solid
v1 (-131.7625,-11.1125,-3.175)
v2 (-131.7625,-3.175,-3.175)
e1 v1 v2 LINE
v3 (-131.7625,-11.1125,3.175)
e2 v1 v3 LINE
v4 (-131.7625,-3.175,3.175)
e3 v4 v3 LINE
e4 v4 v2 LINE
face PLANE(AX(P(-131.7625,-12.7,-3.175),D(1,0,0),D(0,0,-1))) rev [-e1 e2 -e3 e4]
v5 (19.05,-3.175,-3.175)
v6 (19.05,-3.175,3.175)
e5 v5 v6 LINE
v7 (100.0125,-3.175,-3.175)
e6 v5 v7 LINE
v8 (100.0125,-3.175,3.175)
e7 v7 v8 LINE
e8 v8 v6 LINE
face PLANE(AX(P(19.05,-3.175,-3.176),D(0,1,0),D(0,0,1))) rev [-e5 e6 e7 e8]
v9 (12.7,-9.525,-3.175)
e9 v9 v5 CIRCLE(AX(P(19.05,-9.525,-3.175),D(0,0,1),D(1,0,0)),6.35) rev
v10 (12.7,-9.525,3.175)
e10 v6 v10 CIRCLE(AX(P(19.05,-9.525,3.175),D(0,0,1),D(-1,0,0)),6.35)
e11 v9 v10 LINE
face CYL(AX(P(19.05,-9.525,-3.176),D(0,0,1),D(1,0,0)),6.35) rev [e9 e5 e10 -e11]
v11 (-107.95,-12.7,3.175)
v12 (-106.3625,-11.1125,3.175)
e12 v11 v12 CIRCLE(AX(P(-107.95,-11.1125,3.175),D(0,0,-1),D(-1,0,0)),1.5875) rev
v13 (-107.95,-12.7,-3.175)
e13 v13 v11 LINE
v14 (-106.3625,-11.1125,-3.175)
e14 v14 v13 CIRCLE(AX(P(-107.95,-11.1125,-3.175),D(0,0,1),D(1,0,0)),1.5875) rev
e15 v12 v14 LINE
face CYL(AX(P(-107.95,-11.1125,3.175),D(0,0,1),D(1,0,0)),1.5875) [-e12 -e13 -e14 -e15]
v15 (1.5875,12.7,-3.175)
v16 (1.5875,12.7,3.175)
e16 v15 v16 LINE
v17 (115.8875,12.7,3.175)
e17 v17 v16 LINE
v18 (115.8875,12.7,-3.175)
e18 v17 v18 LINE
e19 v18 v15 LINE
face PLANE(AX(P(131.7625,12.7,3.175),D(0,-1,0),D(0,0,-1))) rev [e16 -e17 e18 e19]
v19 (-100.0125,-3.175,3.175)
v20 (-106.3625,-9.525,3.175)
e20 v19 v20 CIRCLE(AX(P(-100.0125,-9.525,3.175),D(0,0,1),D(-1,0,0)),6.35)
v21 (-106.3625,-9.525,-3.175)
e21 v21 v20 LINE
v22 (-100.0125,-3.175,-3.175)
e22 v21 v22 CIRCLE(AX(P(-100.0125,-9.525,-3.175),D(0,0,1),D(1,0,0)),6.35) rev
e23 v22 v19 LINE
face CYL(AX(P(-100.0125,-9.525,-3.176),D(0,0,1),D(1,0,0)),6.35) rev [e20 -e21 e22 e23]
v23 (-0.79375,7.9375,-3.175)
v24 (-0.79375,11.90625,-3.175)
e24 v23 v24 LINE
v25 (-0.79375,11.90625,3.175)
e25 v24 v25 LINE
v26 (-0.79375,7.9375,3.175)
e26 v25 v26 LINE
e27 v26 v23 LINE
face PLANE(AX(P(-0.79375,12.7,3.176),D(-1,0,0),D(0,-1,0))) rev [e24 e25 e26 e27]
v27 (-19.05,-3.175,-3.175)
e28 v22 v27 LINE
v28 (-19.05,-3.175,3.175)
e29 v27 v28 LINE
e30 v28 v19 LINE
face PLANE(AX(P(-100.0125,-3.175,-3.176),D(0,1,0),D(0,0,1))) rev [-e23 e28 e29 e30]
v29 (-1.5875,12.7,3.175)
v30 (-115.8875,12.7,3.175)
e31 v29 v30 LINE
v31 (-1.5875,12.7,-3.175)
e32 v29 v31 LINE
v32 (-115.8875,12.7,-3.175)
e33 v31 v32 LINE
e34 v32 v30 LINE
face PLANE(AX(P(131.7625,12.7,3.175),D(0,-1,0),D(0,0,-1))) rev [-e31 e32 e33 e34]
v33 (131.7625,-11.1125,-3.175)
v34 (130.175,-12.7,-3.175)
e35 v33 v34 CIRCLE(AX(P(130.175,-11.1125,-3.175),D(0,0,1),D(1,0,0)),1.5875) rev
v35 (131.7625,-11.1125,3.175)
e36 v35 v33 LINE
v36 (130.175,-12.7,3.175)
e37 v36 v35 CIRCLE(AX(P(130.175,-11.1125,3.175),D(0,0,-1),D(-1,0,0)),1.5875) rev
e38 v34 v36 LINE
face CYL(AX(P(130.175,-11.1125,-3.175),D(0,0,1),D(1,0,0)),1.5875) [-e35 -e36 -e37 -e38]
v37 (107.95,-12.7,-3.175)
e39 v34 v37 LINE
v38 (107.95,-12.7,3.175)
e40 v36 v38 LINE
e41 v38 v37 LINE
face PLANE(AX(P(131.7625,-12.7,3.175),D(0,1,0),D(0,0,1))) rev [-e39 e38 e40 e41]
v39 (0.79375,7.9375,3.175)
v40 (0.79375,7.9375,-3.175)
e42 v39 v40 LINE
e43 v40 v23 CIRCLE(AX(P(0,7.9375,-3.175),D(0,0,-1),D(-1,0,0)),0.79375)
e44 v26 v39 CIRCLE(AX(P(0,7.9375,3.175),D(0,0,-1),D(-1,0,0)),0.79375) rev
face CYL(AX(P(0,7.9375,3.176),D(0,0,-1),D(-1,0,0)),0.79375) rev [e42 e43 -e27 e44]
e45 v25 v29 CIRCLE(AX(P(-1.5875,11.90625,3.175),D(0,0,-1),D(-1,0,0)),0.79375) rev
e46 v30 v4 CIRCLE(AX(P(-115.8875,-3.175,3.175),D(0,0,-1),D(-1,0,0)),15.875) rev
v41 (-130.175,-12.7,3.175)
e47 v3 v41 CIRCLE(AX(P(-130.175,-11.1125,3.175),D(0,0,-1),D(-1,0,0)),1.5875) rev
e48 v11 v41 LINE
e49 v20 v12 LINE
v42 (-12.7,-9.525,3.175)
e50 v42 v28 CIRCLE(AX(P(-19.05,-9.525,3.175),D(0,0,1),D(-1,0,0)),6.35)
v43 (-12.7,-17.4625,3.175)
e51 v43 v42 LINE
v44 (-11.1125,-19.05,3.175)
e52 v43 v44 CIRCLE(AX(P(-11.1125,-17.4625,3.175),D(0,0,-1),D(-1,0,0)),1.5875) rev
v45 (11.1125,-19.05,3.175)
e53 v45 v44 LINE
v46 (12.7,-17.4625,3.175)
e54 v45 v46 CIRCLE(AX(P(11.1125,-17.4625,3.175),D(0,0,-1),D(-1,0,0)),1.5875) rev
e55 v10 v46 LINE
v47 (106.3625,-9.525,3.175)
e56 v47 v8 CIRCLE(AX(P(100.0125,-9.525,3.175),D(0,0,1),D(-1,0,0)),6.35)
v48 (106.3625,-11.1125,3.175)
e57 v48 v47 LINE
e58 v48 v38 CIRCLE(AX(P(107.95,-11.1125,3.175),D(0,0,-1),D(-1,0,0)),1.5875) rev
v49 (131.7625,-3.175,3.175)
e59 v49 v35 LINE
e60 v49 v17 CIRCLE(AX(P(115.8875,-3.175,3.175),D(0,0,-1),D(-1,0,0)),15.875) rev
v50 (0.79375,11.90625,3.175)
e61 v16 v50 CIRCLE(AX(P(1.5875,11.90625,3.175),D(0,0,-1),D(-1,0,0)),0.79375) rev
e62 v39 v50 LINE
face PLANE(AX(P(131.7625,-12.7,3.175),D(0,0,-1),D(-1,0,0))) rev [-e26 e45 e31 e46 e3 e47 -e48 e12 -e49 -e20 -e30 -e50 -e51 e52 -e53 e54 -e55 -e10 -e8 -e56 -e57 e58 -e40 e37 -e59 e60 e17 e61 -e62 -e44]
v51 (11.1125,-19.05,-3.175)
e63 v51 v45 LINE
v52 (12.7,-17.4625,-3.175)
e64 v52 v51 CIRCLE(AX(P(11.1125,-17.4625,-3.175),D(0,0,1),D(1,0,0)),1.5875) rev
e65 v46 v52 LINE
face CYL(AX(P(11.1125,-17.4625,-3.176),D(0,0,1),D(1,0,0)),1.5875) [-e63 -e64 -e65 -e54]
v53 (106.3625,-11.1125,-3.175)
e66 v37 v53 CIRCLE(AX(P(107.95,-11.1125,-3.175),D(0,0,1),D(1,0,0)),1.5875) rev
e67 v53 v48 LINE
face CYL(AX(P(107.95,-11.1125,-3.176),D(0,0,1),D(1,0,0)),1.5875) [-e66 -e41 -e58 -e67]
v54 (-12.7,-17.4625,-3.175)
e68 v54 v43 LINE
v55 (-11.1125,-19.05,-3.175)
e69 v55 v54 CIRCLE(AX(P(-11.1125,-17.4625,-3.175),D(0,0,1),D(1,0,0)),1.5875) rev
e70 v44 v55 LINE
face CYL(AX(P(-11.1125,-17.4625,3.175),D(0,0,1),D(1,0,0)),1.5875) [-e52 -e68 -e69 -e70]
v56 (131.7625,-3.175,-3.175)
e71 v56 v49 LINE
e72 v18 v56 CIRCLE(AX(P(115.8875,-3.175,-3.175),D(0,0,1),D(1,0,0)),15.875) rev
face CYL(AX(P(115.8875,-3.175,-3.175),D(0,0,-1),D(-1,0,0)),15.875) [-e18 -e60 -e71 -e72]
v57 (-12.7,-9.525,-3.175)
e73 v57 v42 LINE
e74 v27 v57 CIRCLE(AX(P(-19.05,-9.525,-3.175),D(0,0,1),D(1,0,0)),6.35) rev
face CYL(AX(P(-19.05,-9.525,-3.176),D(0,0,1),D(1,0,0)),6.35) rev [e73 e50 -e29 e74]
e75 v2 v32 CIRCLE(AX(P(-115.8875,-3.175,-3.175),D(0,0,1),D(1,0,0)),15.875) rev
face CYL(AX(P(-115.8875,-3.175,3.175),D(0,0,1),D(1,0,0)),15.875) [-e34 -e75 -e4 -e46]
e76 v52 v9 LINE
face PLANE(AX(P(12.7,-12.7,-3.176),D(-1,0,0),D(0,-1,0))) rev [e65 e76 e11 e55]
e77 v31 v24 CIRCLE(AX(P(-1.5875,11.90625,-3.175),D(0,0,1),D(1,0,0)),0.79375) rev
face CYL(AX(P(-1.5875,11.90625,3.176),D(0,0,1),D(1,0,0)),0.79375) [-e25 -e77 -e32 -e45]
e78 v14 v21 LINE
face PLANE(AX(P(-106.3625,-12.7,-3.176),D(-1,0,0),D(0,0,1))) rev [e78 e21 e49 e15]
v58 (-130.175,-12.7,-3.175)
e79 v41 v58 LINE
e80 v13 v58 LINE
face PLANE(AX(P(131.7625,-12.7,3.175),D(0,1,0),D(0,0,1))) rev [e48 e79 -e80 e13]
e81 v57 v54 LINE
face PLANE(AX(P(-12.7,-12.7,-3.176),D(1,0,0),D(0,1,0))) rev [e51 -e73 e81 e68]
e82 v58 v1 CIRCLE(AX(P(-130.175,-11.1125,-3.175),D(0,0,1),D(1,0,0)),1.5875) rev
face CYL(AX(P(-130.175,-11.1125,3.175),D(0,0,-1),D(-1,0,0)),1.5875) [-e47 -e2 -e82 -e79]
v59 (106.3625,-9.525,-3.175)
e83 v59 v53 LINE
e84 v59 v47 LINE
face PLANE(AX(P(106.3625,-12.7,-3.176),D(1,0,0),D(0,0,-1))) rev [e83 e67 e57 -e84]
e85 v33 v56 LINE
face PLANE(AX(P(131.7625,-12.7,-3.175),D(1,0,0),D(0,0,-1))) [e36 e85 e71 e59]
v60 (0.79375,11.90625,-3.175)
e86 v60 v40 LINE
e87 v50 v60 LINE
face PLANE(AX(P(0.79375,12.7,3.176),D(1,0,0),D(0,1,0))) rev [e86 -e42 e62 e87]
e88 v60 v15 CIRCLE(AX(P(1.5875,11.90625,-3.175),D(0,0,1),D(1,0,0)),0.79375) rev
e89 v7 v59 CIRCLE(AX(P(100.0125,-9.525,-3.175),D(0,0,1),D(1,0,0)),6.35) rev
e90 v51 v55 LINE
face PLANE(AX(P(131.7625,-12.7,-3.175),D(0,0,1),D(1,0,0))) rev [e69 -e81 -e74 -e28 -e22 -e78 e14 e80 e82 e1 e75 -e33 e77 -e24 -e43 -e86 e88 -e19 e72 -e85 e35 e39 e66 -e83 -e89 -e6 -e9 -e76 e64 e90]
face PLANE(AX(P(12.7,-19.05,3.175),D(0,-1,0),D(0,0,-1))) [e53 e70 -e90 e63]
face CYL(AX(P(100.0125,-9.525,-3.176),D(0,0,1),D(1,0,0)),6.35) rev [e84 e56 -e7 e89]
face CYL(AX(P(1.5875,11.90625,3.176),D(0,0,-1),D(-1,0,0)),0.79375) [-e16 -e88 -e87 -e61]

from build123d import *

# Parameters (mm, degrees)
SKETCH1_W           = 25.4
SKETCH1_H           = 6.35
EXTRUDE1_DEPTH      = 131.7625
EXTRUDE2_REACH      = 134.525
FILLET1_R           = 15.875
SKETCH3_W           = 25.4
SKETCH3_H           = 6.35
TAB1_DEPTH          = 6.35
BREAK_CORNER1_START = -3.175
BREAK_CORNER1_DEPTH = 6.35
CUT_EXTRUDE1_REACH  = 135.284
FILLET2_R           = 0.79375


# Read off the part's stored shape, not the designer's step: Break-Corner1
# Sheet-metal steps are written as plain solids
with BuildPart() as part:
    # Sketch1 → Extrude1 (new, symmetric)
    with BuildSketch(Plane.YZ):
        Rectangle(SKETCH1_W, SKETCH1_H)
    extrude(amount=EXTRUDE1_DEPTH, both=True)

    # Sketch2 → Extrude2 (cut, up to next)
    with BuildSketch(Plane.XY.offset(3.175), mode=Mode.PRIVATE) as extrude2_sk1:
        with BuildLine():
            Line((-106.3625, -12.7), (-12.7, -12.7))
            Line((-12.7, -12.7), (-12.7, -9.525))
            ThreePointArc((-12.7, -9.525), (-14.559871939, -5.034871939), (-19.05, -3.175))
            Line((-19.05, -3.175), (-100.0125, -3.175))
            ThreePointArc((-100.0125, -3.175), (-104.502628061, -5.034871939), (-106.3625, -9.525))
            Line((-106.3625, -9.525), (-106.3625, -12.7))
        make_face()
    extrude2_tool1 = extrude(extrude2_sk1.sketch, amount=-EXTRUDE2_REACH, mode=Mode.PRIVATE) & part.part
    # Sketch2 → Extrude2 (cut, up to next)
    with BuildSketch(Plane.XY.offset(3.175), mode=Mode.PRIVATE) as extrude2_sk2:
        with BuildLine():
            Line((12.7, -12.7), (106.3625, -12.7))
            Line((106.3625, -12.7), (106.3625, -9.525))
            ThreePointArc((106.3625, -9.525), (104.502628061, -5.034871939), (100.0125, -3.175))
            Line((100.0125, -3.175), (19.05, -3.175))
            ThreePointArc((19.05, -3.175), (14.559871939, -5.034871939), (12.7, -9.525))
            Line((12.7, -9.525), (12.7, -12.7))
        make_face()
    extrude2_tool2 = extrude(extrude2_sk2.sketch, amount=-EXTRUDE2_REACH, mode=Mode.PRIVATE) & part.part
    add(extrude2_tool1.solids().sort_by_distance((-59.53125, -8.003656, 3.175))[0], mode=Mode.SUBTRACT)
    add(extrude2_tool2.solids().sort_by_distance((59.53125, -8.003656, 3.175))[0], mode=Mode.SUBTRACT)

    # Fillet1
    fillet1_edges = [part.edges().sort_by_distance(p)[0] for p in [
        (131.7625, 12.7, 0),
        (-131.7625, 12.7, 0),
    ]]
    fillet(fillet1_edges, radius=FILLET1_R)

    # Sketch3 → Tab1 (add)
    with BuildSketch(Plane(origin=(0, 0, -3.175), x_dir=(-1, 0, 0), z_dir=(0, 0, -1))):
        with Locations((0, -15.875)):
            Rectangle(SKETCH3_W, SKETCH3_H)
    extrude(amount=-TAB1_DEPTH)

    # Break-Corner1 outline → Break-Corner1 (cut)
    with BuildSketch(Plane.XY.offset(BREAK_CORNER1_START)):
        with BuildLine():
            Line((-131.7625, -12.7), (-130.175, -12.7))
            ThreePointArc((-130.175, -12.7), (-131.297532015, -12.235032015), (-131.7625, -11.1125))
            Line((-131.7625, -11.1125), (-131.7625, -12.7))
        make_face()
        with BuildLine():
            ThreePointArc((-106.3625, -11.1125), (-106.827467985, -12.235032015), (-107.95, -12.7))
            Line((-107.95, -12.7), (-106.3625, -12.7))
            Line((-106.3625, -12.7), (-106.3625, -11.1125))
        make_face()
        with BuildLine():
            ThreePointArc((12.7, -17.4625), (12.235032015, -18.585032015), (11.1125, -19.05))
            Line((11.1125, -19.05), (12.7, -19.05))
            Line((12.7, -19.05), (12.7, -17.4625))
        make_face()
        with BuildLine():
            ThreePointArc((-11.1125, -19.05), (-12.235032015, -18.585032015), (-12.7, -17.4625))
            Line((-12.7, -17.4625), (-12.7, -19.05))
            Line((-12.7, -19.05), (-11.1125, -19.05))
        make_face()
        with BuildLine():
            Line((106.3625, -12.7), (107.95, -12.7))
            ThreePointArc((107.95, -12.7), (106.827467985, -12.235032015), (106.3625, -11.1125))
            Line((106.3625, -11.1125), (106.3625, -12.7))
        make_face()
        with BuildLine():
            ThreePointArc((131.7625, -11.1125), (131.297532015, -12.235032015), (130.175, -12.7))
            Line((130.175, -12.7), (131.7625, -12.7))
            Line((131.7625, -12.7), (131.7625, -11.1125))
        make_face()
    extrude(amount=BREAK_CORNER1_DEPTH, mode=Mode.SUBTRACT)

    # Sketch4 → Cut-Extrude1 (cut, up to next)
    with BuildSketch(Plane(origin=(0, 0, -3.175), x_dir=(-1, 0, 0), z_dir=(0, 0, -1)), mode=Mode.PRIVATE) as cut_extrude1_sk1:
        with BuildLine():
            Line((0.79375, 12.7), (0.79375, 7.9375))
            ThreePointArc((0.79375, 7.9375), (0, 7.14375), (-0.79375, 7.9375))
            Line((-0.79375, 7.9375), (-0.79375, 12.7))
            ThreePointArc((-0.79375, 12.7), (0, 13.49375), (0.79375, 12.7))
        make_face()
    cut_extrude1_tool1 = extrude(cut_extrude1_sk1.sketch, amount=-CUT_EXTRUDE1_REACH, mode=Mode.PRIVATE) & part.part
    add(cut_extrude1_tool1.solids().sort_by_distance((0, 10.31875, -3.175))[0], mode=Mode.SUBTRACT)

    # Fillet2
    fillet2_edges = [part.edges().sort_by_distance(p)[0] for p in [
        (-0.79375, 12.7, 0),
        (0.79375, 12.7, 0),
    ]]
    fillet(fillet2_edges, radius=FILLET2_R)


solid = part.part
